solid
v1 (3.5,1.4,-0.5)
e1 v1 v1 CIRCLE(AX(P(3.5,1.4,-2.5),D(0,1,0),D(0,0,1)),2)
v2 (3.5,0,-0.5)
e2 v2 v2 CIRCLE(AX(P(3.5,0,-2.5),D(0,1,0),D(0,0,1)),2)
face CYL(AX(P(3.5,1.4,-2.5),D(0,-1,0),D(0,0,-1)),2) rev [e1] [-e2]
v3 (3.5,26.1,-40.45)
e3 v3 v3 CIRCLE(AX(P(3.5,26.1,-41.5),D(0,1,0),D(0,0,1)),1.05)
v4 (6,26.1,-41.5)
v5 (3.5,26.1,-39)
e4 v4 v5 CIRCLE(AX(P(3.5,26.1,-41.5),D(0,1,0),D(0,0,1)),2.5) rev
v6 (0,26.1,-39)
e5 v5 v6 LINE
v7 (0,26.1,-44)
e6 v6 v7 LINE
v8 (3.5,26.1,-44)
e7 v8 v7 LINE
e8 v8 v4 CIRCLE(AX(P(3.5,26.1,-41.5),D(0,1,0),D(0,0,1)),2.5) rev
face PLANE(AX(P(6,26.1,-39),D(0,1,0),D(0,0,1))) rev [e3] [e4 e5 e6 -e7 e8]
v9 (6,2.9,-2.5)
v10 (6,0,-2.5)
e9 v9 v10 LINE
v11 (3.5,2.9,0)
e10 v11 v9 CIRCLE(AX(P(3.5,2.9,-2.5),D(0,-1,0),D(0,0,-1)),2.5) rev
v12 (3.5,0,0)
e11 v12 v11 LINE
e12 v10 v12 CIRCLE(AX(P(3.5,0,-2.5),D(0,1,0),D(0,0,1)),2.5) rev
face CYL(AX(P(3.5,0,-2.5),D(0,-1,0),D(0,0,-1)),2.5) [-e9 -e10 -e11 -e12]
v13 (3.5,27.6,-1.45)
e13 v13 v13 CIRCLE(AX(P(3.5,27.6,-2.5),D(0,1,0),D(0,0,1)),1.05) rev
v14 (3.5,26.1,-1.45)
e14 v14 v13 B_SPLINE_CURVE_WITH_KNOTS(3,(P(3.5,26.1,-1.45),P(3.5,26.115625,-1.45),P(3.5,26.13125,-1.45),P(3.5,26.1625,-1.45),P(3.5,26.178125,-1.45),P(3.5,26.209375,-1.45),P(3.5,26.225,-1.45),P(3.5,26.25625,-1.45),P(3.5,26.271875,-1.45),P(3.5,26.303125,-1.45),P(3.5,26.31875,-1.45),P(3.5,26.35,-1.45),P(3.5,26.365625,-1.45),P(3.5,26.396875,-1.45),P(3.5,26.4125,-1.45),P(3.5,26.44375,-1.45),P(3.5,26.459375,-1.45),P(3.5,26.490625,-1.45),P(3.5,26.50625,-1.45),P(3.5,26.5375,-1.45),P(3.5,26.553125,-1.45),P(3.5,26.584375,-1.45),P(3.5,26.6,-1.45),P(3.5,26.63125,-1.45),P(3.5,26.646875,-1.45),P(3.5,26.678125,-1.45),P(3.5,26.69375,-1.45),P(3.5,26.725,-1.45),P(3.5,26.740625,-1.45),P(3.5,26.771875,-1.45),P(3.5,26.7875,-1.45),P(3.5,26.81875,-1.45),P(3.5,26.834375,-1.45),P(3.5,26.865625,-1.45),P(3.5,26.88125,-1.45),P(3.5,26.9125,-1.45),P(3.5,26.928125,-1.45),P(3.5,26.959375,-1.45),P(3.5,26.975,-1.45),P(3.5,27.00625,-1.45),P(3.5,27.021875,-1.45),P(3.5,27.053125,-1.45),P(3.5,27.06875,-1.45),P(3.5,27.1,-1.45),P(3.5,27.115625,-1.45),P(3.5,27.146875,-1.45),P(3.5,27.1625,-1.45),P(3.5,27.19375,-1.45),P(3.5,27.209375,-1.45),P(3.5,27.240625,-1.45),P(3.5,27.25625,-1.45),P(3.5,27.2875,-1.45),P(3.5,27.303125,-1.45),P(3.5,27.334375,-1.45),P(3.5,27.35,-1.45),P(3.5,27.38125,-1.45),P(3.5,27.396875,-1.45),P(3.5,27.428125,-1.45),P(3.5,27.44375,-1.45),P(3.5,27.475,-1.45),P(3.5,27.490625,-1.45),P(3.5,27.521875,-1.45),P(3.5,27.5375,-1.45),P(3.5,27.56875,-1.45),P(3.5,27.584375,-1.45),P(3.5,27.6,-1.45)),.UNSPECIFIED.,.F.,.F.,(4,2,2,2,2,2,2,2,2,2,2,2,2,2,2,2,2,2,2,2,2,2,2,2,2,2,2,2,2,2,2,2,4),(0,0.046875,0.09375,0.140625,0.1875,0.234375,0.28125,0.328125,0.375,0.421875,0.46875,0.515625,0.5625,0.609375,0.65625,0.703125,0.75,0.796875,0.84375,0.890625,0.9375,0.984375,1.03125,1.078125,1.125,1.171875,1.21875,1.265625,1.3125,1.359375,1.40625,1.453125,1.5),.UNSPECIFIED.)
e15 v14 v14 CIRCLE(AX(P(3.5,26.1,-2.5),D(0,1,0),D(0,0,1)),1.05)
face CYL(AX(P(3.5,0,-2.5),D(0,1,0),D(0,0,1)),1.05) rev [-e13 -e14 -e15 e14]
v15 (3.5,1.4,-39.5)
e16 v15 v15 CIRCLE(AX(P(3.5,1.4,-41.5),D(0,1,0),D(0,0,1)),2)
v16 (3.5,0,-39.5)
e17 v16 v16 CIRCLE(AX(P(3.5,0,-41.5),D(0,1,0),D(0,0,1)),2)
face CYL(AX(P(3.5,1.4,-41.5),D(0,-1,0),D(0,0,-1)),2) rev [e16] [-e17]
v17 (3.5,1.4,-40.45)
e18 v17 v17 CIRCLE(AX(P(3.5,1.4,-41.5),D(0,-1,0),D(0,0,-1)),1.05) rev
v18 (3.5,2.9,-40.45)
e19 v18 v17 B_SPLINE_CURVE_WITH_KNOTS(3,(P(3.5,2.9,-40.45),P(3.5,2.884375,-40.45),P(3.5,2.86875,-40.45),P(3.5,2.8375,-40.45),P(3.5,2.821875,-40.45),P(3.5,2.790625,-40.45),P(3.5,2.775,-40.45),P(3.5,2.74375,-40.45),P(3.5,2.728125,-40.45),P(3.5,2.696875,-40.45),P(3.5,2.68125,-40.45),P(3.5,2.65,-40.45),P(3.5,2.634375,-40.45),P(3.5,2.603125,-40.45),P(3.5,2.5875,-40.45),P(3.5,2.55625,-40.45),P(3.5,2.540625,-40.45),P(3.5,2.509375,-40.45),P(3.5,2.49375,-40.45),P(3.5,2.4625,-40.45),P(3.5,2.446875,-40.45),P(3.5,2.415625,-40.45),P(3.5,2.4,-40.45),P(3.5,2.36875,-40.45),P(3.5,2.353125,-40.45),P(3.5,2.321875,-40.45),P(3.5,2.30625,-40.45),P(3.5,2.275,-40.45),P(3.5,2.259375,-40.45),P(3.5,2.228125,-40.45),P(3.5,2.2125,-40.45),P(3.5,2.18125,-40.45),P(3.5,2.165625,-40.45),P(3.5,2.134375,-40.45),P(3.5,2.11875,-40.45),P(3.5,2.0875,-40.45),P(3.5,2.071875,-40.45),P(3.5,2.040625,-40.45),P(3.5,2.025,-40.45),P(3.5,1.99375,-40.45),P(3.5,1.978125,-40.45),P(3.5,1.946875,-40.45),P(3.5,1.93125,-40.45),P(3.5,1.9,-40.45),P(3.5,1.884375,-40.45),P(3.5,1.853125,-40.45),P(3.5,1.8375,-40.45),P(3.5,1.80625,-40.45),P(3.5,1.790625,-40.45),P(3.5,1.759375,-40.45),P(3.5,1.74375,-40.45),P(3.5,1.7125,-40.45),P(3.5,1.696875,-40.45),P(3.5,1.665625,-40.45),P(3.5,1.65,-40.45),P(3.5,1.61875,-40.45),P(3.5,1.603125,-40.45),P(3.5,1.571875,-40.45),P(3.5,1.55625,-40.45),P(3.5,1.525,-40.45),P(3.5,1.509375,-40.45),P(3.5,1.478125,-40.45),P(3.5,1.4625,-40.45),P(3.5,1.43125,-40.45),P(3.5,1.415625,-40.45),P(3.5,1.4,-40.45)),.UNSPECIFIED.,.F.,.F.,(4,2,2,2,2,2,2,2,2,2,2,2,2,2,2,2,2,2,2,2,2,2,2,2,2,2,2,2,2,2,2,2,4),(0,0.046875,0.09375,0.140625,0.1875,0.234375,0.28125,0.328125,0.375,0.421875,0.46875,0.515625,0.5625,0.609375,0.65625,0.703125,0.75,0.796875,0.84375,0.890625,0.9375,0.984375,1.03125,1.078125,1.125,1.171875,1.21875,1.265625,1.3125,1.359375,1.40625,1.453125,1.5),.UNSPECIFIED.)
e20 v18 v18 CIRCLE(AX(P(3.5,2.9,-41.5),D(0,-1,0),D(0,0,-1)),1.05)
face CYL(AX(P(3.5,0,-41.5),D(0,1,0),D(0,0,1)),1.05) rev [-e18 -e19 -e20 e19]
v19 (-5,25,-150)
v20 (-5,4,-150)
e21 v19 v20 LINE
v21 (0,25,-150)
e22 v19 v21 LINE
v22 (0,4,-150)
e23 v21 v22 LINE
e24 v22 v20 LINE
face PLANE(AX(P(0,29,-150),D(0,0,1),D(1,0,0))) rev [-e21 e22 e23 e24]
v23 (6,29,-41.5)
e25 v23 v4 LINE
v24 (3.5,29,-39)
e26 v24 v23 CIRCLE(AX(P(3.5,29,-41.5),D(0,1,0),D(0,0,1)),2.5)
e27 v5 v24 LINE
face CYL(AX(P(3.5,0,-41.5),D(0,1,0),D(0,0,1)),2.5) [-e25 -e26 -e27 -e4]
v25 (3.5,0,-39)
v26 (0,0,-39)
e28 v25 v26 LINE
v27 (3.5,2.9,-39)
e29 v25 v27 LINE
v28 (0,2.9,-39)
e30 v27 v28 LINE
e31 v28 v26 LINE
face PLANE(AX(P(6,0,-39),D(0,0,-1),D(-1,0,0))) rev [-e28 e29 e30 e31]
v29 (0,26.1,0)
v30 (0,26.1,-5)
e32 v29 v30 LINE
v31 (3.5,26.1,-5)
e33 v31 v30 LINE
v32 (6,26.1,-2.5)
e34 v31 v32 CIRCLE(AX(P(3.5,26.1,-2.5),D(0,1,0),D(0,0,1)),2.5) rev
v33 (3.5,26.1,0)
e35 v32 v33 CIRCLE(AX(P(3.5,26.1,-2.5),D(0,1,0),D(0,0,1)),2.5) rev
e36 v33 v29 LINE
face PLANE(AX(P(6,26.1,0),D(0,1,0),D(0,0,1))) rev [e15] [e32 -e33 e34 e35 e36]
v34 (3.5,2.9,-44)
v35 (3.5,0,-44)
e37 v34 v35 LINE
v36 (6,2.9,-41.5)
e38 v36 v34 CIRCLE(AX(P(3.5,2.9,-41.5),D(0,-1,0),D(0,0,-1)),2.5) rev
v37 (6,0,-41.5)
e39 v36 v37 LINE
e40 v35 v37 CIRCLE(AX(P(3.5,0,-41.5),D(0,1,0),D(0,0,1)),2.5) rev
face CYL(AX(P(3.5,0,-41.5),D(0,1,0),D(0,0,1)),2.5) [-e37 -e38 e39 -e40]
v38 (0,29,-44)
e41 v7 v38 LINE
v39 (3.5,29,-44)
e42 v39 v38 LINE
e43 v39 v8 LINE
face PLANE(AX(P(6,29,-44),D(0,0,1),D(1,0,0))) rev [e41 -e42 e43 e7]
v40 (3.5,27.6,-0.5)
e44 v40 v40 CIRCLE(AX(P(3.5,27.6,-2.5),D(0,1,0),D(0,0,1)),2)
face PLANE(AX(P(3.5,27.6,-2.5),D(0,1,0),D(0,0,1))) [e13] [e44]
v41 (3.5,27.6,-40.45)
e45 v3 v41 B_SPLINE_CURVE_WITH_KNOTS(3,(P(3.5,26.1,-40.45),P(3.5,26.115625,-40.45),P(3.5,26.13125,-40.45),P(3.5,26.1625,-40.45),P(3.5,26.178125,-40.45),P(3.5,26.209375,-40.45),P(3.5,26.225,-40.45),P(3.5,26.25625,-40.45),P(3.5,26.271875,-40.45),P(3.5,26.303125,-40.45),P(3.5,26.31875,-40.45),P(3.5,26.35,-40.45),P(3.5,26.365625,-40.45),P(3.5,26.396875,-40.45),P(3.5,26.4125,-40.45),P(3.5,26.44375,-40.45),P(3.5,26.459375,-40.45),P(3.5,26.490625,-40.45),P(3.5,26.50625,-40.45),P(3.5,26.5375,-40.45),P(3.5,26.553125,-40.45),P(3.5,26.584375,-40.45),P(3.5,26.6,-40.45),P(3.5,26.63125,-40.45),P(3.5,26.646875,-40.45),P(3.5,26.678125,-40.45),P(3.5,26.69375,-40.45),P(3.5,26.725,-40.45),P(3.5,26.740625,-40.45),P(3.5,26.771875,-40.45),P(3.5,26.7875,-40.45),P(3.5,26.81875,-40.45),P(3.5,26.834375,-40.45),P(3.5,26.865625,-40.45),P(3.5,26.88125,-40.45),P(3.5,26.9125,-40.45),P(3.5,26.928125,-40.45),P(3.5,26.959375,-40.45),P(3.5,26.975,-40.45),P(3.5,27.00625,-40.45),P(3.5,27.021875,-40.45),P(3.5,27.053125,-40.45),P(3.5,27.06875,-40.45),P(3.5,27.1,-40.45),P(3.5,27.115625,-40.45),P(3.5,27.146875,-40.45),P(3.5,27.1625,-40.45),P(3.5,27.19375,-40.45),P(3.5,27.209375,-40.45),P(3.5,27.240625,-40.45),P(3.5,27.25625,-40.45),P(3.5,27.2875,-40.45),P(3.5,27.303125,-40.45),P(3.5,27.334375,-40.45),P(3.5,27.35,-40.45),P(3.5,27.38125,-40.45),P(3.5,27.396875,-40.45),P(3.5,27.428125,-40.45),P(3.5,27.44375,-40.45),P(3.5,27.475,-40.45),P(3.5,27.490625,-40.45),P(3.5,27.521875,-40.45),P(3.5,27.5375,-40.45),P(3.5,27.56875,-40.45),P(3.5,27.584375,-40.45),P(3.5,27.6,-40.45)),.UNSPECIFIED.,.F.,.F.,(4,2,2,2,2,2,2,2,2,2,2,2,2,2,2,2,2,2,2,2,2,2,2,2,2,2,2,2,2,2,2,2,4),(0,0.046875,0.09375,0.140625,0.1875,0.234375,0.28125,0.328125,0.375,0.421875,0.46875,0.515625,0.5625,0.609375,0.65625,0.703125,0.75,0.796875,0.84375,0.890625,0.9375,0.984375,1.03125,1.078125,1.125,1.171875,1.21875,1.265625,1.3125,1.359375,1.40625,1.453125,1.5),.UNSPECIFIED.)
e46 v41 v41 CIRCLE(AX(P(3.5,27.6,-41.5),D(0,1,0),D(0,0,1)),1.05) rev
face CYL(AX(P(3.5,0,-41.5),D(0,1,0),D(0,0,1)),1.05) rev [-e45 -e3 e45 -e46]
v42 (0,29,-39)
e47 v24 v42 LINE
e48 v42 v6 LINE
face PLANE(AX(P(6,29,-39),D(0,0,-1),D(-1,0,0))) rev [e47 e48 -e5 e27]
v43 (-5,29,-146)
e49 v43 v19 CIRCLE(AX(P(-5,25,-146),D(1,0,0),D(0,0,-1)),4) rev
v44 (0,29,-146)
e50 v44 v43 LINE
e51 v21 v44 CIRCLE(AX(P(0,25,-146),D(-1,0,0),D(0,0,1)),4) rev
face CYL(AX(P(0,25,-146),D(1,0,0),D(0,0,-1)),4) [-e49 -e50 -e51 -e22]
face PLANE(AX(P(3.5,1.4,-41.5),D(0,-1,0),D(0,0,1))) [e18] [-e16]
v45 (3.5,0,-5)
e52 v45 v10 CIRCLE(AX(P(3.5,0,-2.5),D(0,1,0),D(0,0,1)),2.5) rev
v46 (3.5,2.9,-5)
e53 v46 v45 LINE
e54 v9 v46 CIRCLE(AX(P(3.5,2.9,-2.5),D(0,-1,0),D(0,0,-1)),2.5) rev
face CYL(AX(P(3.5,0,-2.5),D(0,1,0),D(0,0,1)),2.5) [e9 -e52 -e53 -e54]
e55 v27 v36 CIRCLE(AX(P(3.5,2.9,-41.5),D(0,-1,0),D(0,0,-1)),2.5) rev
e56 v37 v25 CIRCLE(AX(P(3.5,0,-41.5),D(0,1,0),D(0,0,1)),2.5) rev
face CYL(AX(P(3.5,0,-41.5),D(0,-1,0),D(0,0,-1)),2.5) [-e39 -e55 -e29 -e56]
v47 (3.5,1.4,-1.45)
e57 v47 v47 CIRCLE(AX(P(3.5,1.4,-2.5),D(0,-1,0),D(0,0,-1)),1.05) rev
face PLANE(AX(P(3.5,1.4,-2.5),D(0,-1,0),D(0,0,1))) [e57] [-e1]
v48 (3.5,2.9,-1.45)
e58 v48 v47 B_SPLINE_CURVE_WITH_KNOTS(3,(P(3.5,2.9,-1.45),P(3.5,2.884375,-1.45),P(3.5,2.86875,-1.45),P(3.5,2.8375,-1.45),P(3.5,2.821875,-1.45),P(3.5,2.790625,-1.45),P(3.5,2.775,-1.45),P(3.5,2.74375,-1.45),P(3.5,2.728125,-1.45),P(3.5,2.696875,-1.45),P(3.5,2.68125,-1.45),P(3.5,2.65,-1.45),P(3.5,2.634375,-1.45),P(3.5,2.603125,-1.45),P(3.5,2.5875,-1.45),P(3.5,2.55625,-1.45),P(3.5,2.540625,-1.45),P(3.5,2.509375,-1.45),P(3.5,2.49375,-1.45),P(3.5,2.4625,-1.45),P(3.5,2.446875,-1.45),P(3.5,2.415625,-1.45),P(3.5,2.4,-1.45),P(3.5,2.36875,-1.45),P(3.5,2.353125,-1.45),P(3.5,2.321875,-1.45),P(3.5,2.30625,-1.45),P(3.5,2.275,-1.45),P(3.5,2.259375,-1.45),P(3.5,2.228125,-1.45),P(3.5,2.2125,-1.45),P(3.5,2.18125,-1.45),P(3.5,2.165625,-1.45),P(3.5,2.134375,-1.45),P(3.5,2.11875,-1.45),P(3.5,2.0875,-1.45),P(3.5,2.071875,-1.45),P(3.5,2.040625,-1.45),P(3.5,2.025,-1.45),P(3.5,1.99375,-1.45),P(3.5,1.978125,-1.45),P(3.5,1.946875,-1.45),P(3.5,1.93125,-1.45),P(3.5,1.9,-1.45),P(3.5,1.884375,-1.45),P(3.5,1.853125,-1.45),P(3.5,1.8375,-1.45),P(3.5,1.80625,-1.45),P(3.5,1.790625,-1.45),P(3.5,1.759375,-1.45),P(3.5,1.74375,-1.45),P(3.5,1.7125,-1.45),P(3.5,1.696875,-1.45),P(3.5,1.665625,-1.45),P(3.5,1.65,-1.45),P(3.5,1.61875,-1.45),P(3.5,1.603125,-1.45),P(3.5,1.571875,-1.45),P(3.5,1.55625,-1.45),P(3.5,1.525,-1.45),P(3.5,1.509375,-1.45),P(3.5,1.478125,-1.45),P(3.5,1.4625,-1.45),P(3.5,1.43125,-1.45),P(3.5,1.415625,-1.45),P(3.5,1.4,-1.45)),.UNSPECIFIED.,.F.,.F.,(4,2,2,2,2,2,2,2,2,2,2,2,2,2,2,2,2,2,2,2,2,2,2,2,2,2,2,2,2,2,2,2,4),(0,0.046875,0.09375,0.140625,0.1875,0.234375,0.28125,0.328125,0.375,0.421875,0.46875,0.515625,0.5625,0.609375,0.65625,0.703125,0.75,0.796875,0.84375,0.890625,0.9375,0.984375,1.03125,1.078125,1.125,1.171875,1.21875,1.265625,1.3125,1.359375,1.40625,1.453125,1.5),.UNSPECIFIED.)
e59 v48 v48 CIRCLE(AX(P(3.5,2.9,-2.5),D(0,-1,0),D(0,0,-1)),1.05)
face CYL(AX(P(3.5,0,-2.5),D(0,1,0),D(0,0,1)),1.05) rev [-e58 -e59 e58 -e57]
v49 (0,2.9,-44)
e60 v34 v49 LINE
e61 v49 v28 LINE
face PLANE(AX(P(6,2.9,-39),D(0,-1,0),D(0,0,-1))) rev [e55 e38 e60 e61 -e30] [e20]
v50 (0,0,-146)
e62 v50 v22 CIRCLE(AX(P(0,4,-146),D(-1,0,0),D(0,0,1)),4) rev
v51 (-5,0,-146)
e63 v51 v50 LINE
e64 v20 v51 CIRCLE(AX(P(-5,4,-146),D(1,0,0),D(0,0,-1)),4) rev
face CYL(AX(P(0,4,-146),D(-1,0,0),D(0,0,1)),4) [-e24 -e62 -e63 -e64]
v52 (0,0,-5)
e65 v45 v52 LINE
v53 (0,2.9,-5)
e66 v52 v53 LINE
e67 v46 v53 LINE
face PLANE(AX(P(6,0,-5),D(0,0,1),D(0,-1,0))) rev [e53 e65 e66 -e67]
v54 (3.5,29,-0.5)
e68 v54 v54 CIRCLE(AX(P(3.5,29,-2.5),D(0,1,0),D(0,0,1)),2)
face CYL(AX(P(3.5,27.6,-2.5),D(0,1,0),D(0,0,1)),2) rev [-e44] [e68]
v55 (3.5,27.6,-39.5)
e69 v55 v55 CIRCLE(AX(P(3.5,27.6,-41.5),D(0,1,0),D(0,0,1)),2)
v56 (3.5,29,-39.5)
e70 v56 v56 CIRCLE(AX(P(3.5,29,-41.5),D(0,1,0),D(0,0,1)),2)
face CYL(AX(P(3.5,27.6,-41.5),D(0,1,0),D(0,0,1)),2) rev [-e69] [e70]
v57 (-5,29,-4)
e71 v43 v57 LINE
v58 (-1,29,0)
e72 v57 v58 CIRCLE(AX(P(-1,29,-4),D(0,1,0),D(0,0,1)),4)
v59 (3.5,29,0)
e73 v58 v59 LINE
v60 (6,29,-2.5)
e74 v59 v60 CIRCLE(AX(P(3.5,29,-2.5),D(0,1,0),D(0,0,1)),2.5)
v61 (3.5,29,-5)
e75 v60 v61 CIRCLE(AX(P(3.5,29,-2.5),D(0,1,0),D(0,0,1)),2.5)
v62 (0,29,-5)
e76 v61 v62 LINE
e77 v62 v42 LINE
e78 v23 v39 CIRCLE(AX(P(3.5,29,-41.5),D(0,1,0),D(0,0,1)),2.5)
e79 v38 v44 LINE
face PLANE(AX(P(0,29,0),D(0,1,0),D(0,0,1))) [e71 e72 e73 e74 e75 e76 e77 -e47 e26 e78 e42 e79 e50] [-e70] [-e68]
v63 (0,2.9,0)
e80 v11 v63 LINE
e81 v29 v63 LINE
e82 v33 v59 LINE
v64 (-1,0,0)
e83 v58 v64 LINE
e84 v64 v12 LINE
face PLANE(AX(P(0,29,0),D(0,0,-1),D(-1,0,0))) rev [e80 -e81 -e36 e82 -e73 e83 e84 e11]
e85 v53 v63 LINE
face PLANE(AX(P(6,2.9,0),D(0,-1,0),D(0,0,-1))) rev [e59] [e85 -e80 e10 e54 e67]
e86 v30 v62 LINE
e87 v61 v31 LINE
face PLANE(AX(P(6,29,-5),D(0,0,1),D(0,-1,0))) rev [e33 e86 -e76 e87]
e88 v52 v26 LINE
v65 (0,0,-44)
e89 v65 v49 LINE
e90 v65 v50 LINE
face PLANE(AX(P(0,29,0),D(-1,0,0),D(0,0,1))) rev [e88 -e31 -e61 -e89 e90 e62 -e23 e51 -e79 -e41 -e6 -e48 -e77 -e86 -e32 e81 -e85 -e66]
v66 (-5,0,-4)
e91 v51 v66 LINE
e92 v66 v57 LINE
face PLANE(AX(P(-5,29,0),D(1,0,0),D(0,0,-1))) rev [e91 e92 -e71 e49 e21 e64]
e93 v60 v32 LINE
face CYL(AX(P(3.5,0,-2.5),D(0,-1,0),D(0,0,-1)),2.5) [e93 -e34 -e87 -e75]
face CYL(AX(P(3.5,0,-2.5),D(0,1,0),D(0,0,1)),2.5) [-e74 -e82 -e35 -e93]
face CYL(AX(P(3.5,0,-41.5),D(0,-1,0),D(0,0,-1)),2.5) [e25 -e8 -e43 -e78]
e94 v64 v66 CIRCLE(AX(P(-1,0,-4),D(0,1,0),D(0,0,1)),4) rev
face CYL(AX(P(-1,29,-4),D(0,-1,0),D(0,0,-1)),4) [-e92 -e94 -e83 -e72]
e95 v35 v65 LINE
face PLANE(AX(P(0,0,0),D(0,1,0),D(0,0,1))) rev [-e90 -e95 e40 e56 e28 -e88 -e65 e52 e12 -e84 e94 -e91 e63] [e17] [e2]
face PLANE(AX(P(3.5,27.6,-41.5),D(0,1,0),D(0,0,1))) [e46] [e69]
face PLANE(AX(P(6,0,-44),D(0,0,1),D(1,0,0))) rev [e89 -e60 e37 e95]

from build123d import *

# Parameters (mm, degrees)
SKETCH1_W           = 5
SKETCH1_H           = 150
BOSS_EXTRUDE1_DEPTH = 29
SKETCH2_W           = 5
SKETCH2_H           = 2.9
BOSS_EXTRUDE2_DEPTH = 6
SKETCH3_R           = 1.05
CUT_EXTRUDE1_DEPTH  = 153.895389074
SKETCH4_R           = 2
CUT_EXTRUDE2_DEPTH  = 1.4
FILLET1_R           = 4
FILLET2_R           = 2.5


with BuildPart() as part:
    # Sketch1 → Boss-Extrude1 (new body)
    with BuildSketch(Plane(origin=(0, 0, 0), x_dir=(1, 0, 0), z_dir=(0, 1, 0))):
        with Locations((-2.5, 75)):
            Rectangle(SKETCH1_W, SKETCH1_H)
    extrude(amount=BOSS_EXTRUDE1_DEPTH)

    # Sketch2 → Boss-Extrude2 (add)
    with BuildSketch(Plane(origin=(0, 0, 0), x_dir=(0, 0, -1), z_dir=(1, 0, 0))):
        with Locations((2.5, 27.55)):
            Rectangle(SKETCH2_W, SKETCH2_H)
        with Locations((41.5, 27.55)):
            Rectangle(SKETCH2_W, SKETCH2_H)
        with Locations((41.5, 1.45)):
            Rectangle(SKETCH2_W, SKETCH2_H)
        with Locations((2.5, 1.45)):
            Rectangle(SKETCH2_W, SKETCH2_H)
    extrude(amount=BOSS_EXTRUDE2_DEPTH)

    # Sketch3 → Cut-Extrude1 (cut, through all)
    with BuildSketch(Plane(origin=(0, 29, 0), x_dir=(1, 0, 0), z_dir=(0, 1, 0))):
        with Locations(Location((3.5, 41.5, 0), (0, 0, 270))):
            Circle(SKETCH3_R)
        with Locations(Location((3.5, 2.5, 0), (0, 0, 270))):
            Circle(SKETCH3_R)
    extrude(amount=-CUT_EXTRUDE1_DEPTH, mode=Mode.SUBTRACT)

    # Sketch4 → Cut-Extrude2 (cut)
    with BuildSketch(Plane(origin=(0, 29, 0), x_dir=(1, 0, 0), z_dir=(0, 1, 0))):
        with Locations(Location((3.5, 41.5, 0), (0, 0, 270))):
            Circle(SKETCH4_R)
        with Locations(Location((3.5, 2.5, 0), (0, 0, 270))):
            Circle(SKETCH4_R)
    cut_extrude2 = extrude(amount=-CUT_EXTRUDE2_DEPTH, mode=Mode.SUBTRACT)

    # Mirror2: Cut-Extrude2 across plane
    add(cut_extrude2.mirror(Plane.ZX.offset(14.5)), mode=Mode.SUBTRACT)

    # Fillet1
    fillet1_edges = [part.edges().sort_by_distance(p)[0] for p in [
        (-2.5, 0, -150),
        (-5, 14.5, 0),
        (-2.5, 29, -150),
    ]]
    fillet(fillet1_edges, radius=FILLET1_R)

    # Fillet2
    fillet2_edges = [part.edges().sort_by_distance(p)[0] for p in [
        (6, 1.45, -5),
        (6, 1.45, 0),
        (6, 1.45, -44),
        (6, 1.45, -39),
        (6, 27.55, -44),
        (6, 27.55, -39),
        (6, 27.55, -5),
        (6, 27.55, 0),
    ]]
    fillet(fillet2_edges, radius=FILLET2_R - 0.0001)  # a hair under: the kernel refuses the full size


solid = part.part
